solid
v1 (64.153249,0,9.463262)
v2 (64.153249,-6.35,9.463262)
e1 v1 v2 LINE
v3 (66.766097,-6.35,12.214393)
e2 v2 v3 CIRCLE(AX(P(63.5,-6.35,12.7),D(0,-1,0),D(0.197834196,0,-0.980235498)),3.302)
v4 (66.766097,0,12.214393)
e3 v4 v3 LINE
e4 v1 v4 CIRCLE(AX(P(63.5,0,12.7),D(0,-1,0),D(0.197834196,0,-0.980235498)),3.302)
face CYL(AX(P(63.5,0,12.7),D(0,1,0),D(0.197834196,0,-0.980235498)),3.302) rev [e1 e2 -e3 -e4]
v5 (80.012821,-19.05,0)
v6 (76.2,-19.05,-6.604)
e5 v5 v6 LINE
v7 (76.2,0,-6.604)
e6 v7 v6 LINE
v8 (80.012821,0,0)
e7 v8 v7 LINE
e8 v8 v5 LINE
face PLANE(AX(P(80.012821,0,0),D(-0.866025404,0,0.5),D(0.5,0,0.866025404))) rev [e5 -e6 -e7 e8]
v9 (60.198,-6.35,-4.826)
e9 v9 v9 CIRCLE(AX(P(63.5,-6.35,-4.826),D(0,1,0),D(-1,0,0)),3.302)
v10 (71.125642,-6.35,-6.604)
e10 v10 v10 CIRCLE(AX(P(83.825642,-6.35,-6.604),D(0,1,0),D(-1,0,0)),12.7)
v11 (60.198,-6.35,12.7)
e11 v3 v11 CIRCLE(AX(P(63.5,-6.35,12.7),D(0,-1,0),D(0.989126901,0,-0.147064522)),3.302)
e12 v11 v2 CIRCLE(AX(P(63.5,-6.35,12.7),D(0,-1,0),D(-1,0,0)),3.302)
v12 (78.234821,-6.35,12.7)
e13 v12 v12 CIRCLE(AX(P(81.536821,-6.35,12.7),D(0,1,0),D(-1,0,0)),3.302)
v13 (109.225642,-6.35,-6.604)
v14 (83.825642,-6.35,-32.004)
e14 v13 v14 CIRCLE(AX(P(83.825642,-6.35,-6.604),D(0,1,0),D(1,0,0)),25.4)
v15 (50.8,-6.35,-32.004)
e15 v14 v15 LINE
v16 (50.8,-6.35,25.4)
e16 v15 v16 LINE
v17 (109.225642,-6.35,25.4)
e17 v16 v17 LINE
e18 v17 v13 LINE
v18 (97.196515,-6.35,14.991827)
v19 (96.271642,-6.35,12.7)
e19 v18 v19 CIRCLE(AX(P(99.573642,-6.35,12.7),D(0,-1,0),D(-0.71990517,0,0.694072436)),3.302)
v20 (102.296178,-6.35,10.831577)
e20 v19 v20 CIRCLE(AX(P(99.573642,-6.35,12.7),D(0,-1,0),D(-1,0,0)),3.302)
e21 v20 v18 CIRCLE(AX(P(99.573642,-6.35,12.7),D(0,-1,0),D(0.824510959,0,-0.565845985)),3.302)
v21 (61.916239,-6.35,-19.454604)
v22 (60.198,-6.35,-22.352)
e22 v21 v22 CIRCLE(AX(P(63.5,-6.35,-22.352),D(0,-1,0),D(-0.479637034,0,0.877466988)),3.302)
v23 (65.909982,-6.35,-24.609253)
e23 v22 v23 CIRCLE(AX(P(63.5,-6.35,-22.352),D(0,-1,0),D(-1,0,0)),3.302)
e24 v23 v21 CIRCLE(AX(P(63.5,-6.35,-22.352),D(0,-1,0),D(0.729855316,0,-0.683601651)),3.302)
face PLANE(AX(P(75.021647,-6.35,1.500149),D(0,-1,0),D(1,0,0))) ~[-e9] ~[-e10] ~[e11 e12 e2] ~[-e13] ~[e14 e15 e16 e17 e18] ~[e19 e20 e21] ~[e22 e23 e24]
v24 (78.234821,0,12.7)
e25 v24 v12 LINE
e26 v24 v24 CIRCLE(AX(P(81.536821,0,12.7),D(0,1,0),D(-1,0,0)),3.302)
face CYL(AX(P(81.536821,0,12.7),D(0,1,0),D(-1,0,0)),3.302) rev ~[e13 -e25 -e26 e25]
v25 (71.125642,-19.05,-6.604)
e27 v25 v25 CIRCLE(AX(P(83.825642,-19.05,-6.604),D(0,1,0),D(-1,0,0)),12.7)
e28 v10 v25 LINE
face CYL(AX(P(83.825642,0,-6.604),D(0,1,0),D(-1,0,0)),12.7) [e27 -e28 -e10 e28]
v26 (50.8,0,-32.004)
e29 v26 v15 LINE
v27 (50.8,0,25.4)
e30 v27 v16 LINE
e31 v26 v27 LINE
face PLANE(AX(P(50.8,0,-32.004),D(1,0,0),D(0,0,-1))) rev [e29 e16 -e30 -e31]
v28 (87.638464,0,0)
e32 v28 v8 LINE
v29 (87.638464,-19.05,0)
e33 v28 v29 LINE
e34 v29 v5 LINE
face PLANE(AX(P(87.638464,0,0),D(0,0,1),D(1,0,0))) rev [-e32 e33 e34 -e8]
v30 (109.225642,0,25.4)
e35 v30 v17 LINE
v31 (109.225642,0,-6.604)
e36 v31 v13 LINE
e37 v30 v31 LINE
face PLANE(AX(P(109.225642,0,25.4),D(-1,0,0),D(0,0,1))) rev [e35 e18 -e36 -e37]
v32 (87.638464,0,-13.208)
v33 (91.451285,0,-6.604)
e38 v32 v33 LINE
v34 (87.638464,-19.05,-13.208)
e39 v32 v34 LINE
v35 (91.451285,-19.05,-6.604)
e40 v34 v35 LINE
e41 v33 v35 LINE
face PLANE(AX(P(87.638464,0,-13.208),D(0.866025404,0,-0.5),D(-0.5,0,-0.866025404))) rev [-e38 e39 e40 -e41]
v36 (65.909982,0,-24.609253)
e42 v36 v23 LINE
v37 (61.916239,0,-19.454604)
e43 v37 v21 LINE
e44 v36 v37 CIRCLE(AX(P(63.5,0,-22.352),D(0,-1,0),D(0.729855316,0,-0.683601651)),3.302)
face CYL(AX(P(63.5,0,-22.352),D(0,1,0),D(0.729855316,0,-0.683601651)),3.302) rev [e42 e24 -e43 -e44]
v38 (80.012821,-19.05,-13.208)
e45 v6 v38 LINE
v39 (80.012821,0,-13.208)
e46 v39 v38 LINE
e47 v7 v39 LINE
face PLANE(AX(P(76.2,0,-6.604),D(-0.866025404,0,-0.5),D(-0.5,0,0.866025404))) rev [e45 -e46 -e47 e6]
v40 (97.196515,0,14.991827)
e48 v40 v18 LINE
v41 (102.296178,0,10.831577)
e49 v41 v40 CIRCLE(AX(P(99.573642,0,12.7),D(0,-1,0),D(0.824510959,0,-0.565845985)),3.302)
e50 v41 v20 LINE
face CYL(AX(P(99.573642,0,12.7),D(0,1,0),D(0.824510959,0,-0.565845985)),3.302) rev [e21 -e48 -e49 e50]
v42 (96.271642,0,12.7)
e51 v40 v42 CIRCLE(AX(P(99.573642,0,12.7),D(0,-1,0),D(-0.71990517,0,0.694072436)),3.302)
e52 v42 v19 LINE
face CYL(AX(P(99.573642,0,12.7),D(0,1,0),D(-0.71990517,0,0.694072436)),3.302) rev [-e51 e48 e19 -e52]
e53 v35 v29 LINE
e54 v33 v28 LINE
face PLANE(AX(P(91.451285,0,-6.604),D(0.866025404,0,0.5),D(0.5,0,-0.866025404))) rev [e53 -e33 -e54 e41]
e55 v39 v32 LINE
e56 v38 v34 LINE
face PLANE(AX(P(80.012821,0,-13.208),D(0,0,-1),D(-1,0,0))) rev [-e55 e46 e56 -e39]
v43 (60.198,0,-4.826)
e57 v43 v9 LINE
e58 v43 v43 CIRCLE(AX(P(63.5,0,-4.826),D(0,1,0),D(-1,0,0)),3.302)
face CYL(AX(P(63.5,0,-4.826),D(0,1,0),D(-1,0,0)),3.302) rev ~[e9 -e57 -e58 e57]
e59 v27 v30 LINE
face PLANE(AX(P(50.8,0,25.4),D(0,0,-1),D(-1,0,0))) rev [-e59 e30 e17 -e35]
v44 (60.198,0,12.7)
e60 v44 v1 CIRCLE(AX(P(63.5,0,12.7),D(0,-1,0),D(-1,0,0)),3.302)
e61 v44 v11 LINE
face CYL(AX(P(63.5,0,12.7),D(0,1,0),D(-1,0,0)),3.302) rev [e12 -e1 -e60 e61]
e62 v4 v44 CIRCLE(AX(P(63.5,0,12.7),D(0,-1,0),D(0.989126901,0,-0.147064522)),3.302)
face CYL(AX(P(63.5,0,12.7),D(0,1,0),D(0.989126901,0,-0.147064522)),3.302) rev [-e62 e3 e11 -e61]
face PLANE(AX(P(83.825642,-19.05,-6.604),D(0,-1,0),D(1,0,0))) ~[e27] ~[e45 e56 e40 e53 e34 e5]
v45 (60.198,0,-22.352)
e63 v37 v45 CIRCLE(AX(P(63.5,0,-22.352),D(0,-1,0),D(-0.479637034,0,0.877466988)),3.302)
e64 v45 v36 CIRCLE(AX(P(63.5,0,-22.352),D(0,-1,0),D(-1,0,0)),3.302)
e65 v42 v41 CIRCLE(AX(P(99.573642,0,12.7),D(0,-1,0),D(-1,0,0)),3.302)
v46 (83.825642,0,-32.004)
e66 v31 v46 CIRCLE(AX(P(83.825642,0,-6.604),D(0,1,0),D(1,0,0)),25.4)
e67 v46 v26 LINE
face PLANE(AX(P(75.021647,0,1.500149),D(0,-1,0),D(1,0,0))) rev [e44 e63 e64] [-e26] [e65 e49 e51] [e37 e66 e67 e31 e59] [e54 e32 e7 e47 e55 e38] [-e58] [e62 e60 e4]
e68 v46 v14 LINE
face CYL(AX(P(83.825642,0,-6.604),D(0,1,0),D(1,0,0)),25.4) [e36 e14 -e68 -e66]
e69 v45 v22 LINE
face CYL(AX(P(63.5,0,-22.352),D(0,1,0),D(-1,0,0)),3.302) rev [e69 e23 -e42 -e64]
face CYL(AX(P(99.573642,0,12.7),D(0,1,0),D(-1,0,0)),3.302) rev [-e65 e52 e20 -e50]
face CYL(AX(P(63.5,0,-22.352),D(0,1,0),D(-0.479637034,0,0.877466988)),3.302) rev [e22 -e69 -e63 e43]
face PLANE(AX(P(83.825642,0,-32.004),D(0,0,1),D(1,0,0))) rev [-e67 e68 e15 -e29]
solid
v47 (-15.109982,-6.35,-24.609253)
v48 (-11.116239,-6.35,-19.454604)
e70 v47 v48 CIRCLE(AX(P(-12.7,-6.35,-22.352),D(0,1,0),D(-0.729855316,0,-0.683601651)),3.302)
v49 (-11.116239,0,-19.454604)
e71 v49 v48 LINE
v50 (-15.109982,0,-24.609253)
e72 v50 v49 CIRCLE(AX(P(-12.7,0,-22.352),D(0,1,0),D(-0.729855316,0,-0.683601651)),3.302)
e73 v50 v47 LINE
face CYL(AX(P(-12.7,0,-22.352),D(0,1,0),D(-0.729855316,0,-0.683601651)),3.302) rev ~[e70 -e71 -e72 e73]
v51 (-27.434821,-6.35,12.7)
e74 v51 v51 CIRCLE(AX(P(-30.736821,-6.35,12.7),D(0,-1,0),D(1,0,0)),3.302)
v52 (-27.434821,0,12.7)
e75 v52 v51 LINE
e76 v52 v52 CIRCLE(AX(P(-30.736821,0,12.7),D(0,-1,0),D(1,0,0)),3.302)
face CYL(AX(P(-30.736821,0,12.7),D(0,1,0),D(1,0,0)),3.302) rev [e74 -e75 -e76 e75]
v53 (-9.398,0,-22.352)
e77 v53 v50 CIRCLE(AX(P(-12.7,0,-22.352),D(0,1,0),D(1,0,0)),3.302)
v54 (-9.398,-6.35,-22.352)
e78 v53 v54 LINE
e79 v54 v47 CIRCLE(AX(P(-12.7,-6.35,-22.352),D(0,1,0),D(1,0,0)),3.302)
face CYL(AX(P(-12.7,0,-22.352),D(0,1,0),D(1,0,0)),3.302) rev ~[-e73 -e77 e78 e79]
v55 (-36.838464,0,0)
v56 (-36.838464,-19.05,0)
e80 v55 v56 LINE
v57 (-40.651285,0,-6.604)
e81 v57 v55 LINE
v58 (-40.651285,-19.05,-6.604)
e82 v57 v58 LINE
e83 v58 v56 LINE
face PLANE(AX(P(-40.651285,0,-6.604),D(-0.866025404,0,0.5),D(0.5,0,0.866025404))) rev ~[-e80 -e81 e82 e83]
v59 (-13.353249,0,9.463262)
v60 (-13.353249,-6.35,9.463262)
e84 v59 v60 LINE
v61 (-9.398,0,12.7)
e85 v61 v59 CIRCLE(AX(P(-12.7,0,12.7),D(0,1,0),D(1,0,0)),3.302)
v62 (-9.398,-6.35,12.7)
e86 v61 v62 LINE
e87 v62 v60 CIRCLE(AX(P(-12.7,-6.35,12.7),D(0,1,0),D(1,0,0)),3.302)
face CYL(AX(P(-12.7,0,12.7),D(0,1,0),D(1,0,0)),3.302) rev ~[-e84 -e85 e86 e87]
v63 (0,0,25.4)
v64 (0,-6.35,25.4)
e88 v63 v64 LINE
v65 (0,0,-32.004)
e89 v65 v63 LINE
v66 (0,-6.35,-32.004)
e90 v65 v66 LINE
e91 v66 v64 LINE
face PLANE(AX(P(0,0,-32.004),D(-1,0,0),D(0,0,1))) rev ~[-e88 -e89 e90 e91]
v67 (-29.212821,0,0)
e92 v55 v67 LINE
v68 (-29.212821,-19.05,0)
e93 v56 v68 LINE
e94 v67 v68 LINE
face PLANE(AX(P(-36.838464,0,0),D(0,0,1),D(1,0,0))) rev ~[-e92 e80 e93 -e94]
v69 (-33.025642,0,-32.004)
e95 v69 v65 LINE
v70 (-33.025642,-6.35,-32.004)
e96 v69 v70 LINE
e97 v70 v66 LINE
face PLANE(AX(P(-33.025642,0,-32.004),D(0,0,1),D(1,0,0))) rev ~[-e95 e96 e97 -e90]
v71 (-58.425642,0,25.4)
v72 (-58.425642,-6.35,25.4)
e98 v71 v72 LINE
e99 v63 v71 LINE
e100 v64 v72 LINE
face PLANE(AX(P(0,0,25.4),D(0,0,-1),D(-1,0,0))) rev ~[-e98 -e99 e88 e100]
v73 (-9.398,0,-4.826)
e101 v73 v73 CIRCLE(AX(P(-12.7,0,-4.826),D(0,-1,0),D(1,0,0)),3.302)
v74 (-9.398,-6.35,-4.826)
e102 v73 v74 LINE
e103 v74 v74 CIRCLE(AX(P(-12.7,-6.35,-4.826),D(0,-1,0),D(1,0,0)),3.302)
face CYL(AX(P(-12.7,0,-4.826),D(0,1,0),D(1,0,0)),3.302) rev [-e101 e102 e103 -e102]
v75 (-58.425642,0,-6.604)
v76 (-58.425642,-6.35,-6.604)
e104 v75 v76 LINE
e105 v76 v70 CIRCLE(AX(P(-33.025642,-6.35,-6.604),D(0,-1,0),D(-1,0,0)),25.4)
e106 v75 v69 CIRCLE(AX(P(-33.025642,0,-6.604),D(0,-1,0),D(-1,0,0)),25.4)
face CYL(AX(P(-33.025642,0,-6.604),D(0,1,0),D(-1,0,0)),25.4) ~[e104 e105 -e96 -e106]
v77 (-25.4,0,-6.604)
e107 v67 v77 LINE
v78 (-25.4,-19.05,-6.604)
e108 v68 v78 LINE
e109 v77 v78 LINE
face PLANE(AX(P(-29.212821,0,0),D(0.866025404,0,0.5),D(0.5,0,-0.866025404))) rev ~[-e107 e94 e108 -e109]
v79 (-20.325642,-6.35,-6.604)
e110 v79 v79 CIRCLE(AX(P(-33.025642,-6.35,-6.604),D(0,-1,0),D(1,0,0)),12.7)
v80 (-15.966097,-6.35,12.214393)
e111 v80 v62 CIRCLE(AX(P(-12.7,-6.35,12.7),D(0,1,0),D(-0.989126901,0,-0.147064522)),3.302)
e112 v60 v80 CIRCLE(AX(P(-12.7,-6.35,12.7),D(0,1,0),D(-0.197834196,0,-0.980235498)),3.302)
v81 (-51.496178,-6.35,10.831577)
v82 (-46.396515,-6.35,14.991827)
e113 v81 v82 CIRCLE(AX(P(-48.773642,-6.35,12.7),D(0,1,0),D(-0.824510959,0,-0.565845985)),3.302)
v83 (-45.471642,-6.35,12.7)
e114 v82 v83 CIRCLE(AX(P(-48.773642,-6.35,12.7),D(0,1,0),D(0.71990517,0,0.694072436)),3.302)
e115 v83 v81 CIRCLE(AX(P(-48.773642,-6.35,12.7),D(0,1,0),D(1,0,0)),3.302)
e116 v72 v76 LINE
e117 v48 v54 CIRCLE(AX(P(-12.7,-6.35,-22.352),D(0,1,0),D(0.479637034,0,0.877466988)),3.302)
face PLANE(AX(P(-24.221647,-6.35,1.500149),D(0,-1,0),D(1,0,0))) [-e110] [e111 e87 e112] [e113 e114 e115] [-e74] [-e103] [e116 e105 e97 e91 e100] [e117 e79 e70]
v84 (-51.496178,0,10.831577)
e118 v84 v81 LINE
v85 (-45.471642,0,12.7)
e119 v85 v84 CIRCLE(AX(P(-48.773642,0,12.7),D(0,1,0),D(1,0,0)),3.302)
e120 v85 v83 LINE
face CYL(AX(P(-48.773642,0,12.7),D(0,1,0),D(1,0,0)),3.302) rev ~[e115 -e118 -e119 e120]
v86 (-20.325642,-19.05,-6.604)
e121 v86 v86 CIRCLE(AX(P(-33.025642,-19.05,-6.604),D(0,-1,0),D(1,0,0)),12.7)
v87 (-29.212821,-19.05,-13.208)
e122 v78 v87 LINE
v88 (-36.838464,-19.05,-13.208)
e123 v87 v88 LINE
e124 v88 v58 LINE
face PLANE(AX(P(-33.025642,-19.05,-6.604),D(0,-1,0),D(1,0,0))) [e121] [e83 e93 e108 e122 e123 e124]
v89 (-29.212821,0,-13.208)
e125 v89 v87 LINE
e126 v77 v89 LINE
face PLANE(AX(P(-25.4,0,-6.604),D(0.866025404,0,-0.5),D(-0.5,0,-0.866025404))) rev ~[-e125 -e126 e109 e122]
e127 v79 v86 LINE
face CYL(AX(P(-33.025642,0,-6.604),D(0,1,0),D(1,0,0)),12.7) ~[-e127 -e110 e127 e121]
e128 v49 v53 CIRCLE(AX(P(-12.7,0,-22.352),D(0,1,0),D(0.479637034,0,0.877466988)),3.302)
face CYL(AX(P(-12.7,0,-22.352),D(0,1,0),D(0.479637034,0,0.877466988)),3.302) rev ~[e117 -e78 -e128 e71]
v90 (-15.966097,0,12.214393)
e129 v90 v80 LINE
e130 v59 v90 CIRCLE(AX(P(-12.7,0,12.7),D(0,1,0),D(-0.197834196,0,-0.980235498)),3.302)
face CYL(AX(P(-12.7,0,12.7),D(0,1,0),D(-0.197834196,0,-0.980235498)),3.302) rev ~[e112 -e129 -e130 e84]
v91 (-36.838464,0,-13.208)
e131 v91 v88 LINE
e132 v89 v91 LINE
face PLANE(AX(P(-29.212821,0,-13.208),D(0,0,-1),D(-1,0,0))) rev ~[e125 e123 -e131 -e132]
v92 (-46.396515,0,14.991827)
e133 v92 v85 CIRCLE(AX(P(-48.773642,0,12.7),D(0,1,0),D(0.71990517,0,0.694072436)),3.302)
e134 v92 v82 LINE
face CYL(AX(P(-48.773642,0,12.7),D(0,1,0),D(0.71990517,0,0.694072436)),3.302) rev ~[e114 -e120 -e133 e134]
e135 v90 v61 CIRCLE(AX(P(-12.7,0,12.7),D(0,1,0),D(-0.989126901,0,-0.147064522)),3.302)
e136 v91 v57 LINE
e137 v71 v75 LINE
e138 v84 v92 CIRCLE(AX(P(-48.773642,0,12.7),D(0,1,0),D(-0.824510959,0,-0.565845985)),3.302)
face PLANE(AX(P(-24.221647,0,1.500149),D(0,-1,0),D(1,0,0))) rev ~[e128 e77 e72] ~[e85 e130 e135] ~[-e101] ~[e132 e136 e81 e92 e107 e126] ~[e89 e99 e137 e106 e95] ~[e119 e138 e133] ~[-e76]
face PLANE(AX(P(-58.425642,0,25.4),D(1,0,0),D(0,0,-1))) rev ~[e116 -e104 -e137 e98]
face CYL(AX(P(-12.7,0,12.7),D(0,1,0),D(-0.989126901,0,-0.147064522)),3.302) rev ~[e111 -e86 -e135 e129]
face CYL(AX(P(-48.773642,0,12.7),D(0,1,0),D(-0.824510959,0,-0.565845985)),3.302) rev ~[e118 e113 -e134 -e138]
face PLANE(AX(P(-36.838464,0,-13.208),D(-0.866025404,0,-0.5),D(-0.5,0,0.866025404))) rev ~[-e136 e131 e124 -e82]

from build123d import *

# Parameters (mm, degrees)
F0_R     = 12.7
F0_R_2   = 3.302
F1_DEPTH = 6.35
F2_DEPTH = 19.05


# Not quite as in the source:
# - a feature names something its author has since deleted; it is built from what else it names


with BuildPart() as f1:
    # F0 (on Front) → F1 (new body)
    with BuildSketch(Plane.XZ):
        with BuildLine():
            Line((0, 0), (0, 25.4))
            Line((0, 25.4), (-58.4256423555, 25.4))
            Line((-58.4256423555, 25.4), (-58.4256423555, -6.604))
            ThreePointArc((-58.4256423555, -6.604), (-56.6297902297, 2.7770555445), (-51.4961775421, 10.8315765583))
            ThreePointArc((-51.4961775421, 10.8315765583), (-50.8609248096, 15.2586042986), (-46.3965154848, 14.9918271839))
            ThreePointArc((-46.3965154848, 14.9918271839), (-30.7169390659, 18.6908589465), (-15.9660970274, 12.2143929495))
            ThreePointArc((-15.9660970274, 12.2143929495), (-12.9434662353, 15.9930120243), (-9.398, 12.7))
            ThreePointArc((-9.398, 12.7), (-10.6088068714, 10.1445909723), (-13.3532485155, 9.4632623867))
            ThreePointArc((-13.3532485155, 9.4632623867), (-9.1003544415, 1.9248098954), (-7.6256423555, -6.604))
            ThreePointArc((-7.6256423555, -6.604), (-8.5138201304, -13.2621206963), (-11.1162385134, -19.4546040047))
            ThreePointArc((-11.1162385134, -19.4546040047), (-9.8598605291, -20.6677162396), (-9.398, -22.352))
            ThreePointArc((-9.398, -22.352), (-11.4864427084, -25.4229090999), (-15.1099822531, -24.609252653))
            ThreePointArc((-15.1099822531, -24.609252653), (-23.3347553317, -30.0826436724), (-33.0256423555, -32.004))
            Line((-33.0256423555, -32.004), (0, -32.004))
            Line((0, -32.004), (0, 0))
        make_face()
        with BuildLine():
            ThreePointArc((-51.4961775421, 10.8315765583), (-56.6297902297, 2.7770555445), (-58.4256423555, -6.604))
            ThreePointArc((-58.4256423555, -6.604), (-50.9861545976, -24.5645122421), (-33.0256423555, -32.004))
            ThreePointArc((-33.0256423555, -32.004), (-23.3347553317, -30.0826436724), (-15.1099822531, -24.609252653))
            ThreePointArc((-15.1099822531, -24.609252653), (-15.3102223776, -20.3296392163), (-11.1162385134, -19.4546040047))
            ThreePointArc((-11.1162385134, -19.4546040047), (-8.5138201304, -13.2621206963), (-7.6256423555, -6.604))
            ThreePointArc((-7.6256423555, -6.604), (-9.1003544415, 1.9248098954), (-13.3532485155, 9.4632623867))
            ThreePointArc((-13.3532485155, 9.4632623867), (-15.094263397, 10.4260811832), (-15.9660970274, 12.2143929495))
            ThreePointArc((-15.9660970274, 12.2143929495), (-30.7169390659, 18.6908589465), (-46.3965154848, 14.9918271839))
            ThreePointArc((-46.3965154848, 14.9918271839), (-45.7115779434, 13.9357044698), (-45.4716423555, 12.7))
            ThreePointArc((-45.4716423555, 12.7), (-47.795533769, 9.5461915732), (-51.4961775421, 10.8315765583))
        make_face()
        with Locations((-33.0256423555, -6.604)):
            Circle(F0_R, mode=Mode.SUBTRACT)
        with Locations((-12.7, -4.826)):
            Circle(F0_R_2, mode=Mode.SUBTRACT)
        with Locations((-30.7368211777, 12.7)):
            Circle(F0_R_2, mode=Mode.SUBTRACT)
    extrude(amount=F1_DEPTH)

    # F0 (on Front) → F2 (join)
    with BuildSketch(Plane.XZ):
        with Locations((-33.0256423555, -6.604)):
            Circle(F0_R)
        Polygon((-40.6512847109, -6.604), (-36.8384635332, 0), (-29.2128211777, 0), (-25.4, -6.604), (-29.2128211777, -13.208), (-36.8384635332, -13.208), align=None, mode=Mode.SUBTRACT)
    extrude(amount=F2_DEPTH)


with BuildPart() as f4_1:
    # F4: instance of F1
    add(f1.part.mirror(Plane.YZ.offset(25.4)))


solid = Compound([f1.part, f4_1.part])
